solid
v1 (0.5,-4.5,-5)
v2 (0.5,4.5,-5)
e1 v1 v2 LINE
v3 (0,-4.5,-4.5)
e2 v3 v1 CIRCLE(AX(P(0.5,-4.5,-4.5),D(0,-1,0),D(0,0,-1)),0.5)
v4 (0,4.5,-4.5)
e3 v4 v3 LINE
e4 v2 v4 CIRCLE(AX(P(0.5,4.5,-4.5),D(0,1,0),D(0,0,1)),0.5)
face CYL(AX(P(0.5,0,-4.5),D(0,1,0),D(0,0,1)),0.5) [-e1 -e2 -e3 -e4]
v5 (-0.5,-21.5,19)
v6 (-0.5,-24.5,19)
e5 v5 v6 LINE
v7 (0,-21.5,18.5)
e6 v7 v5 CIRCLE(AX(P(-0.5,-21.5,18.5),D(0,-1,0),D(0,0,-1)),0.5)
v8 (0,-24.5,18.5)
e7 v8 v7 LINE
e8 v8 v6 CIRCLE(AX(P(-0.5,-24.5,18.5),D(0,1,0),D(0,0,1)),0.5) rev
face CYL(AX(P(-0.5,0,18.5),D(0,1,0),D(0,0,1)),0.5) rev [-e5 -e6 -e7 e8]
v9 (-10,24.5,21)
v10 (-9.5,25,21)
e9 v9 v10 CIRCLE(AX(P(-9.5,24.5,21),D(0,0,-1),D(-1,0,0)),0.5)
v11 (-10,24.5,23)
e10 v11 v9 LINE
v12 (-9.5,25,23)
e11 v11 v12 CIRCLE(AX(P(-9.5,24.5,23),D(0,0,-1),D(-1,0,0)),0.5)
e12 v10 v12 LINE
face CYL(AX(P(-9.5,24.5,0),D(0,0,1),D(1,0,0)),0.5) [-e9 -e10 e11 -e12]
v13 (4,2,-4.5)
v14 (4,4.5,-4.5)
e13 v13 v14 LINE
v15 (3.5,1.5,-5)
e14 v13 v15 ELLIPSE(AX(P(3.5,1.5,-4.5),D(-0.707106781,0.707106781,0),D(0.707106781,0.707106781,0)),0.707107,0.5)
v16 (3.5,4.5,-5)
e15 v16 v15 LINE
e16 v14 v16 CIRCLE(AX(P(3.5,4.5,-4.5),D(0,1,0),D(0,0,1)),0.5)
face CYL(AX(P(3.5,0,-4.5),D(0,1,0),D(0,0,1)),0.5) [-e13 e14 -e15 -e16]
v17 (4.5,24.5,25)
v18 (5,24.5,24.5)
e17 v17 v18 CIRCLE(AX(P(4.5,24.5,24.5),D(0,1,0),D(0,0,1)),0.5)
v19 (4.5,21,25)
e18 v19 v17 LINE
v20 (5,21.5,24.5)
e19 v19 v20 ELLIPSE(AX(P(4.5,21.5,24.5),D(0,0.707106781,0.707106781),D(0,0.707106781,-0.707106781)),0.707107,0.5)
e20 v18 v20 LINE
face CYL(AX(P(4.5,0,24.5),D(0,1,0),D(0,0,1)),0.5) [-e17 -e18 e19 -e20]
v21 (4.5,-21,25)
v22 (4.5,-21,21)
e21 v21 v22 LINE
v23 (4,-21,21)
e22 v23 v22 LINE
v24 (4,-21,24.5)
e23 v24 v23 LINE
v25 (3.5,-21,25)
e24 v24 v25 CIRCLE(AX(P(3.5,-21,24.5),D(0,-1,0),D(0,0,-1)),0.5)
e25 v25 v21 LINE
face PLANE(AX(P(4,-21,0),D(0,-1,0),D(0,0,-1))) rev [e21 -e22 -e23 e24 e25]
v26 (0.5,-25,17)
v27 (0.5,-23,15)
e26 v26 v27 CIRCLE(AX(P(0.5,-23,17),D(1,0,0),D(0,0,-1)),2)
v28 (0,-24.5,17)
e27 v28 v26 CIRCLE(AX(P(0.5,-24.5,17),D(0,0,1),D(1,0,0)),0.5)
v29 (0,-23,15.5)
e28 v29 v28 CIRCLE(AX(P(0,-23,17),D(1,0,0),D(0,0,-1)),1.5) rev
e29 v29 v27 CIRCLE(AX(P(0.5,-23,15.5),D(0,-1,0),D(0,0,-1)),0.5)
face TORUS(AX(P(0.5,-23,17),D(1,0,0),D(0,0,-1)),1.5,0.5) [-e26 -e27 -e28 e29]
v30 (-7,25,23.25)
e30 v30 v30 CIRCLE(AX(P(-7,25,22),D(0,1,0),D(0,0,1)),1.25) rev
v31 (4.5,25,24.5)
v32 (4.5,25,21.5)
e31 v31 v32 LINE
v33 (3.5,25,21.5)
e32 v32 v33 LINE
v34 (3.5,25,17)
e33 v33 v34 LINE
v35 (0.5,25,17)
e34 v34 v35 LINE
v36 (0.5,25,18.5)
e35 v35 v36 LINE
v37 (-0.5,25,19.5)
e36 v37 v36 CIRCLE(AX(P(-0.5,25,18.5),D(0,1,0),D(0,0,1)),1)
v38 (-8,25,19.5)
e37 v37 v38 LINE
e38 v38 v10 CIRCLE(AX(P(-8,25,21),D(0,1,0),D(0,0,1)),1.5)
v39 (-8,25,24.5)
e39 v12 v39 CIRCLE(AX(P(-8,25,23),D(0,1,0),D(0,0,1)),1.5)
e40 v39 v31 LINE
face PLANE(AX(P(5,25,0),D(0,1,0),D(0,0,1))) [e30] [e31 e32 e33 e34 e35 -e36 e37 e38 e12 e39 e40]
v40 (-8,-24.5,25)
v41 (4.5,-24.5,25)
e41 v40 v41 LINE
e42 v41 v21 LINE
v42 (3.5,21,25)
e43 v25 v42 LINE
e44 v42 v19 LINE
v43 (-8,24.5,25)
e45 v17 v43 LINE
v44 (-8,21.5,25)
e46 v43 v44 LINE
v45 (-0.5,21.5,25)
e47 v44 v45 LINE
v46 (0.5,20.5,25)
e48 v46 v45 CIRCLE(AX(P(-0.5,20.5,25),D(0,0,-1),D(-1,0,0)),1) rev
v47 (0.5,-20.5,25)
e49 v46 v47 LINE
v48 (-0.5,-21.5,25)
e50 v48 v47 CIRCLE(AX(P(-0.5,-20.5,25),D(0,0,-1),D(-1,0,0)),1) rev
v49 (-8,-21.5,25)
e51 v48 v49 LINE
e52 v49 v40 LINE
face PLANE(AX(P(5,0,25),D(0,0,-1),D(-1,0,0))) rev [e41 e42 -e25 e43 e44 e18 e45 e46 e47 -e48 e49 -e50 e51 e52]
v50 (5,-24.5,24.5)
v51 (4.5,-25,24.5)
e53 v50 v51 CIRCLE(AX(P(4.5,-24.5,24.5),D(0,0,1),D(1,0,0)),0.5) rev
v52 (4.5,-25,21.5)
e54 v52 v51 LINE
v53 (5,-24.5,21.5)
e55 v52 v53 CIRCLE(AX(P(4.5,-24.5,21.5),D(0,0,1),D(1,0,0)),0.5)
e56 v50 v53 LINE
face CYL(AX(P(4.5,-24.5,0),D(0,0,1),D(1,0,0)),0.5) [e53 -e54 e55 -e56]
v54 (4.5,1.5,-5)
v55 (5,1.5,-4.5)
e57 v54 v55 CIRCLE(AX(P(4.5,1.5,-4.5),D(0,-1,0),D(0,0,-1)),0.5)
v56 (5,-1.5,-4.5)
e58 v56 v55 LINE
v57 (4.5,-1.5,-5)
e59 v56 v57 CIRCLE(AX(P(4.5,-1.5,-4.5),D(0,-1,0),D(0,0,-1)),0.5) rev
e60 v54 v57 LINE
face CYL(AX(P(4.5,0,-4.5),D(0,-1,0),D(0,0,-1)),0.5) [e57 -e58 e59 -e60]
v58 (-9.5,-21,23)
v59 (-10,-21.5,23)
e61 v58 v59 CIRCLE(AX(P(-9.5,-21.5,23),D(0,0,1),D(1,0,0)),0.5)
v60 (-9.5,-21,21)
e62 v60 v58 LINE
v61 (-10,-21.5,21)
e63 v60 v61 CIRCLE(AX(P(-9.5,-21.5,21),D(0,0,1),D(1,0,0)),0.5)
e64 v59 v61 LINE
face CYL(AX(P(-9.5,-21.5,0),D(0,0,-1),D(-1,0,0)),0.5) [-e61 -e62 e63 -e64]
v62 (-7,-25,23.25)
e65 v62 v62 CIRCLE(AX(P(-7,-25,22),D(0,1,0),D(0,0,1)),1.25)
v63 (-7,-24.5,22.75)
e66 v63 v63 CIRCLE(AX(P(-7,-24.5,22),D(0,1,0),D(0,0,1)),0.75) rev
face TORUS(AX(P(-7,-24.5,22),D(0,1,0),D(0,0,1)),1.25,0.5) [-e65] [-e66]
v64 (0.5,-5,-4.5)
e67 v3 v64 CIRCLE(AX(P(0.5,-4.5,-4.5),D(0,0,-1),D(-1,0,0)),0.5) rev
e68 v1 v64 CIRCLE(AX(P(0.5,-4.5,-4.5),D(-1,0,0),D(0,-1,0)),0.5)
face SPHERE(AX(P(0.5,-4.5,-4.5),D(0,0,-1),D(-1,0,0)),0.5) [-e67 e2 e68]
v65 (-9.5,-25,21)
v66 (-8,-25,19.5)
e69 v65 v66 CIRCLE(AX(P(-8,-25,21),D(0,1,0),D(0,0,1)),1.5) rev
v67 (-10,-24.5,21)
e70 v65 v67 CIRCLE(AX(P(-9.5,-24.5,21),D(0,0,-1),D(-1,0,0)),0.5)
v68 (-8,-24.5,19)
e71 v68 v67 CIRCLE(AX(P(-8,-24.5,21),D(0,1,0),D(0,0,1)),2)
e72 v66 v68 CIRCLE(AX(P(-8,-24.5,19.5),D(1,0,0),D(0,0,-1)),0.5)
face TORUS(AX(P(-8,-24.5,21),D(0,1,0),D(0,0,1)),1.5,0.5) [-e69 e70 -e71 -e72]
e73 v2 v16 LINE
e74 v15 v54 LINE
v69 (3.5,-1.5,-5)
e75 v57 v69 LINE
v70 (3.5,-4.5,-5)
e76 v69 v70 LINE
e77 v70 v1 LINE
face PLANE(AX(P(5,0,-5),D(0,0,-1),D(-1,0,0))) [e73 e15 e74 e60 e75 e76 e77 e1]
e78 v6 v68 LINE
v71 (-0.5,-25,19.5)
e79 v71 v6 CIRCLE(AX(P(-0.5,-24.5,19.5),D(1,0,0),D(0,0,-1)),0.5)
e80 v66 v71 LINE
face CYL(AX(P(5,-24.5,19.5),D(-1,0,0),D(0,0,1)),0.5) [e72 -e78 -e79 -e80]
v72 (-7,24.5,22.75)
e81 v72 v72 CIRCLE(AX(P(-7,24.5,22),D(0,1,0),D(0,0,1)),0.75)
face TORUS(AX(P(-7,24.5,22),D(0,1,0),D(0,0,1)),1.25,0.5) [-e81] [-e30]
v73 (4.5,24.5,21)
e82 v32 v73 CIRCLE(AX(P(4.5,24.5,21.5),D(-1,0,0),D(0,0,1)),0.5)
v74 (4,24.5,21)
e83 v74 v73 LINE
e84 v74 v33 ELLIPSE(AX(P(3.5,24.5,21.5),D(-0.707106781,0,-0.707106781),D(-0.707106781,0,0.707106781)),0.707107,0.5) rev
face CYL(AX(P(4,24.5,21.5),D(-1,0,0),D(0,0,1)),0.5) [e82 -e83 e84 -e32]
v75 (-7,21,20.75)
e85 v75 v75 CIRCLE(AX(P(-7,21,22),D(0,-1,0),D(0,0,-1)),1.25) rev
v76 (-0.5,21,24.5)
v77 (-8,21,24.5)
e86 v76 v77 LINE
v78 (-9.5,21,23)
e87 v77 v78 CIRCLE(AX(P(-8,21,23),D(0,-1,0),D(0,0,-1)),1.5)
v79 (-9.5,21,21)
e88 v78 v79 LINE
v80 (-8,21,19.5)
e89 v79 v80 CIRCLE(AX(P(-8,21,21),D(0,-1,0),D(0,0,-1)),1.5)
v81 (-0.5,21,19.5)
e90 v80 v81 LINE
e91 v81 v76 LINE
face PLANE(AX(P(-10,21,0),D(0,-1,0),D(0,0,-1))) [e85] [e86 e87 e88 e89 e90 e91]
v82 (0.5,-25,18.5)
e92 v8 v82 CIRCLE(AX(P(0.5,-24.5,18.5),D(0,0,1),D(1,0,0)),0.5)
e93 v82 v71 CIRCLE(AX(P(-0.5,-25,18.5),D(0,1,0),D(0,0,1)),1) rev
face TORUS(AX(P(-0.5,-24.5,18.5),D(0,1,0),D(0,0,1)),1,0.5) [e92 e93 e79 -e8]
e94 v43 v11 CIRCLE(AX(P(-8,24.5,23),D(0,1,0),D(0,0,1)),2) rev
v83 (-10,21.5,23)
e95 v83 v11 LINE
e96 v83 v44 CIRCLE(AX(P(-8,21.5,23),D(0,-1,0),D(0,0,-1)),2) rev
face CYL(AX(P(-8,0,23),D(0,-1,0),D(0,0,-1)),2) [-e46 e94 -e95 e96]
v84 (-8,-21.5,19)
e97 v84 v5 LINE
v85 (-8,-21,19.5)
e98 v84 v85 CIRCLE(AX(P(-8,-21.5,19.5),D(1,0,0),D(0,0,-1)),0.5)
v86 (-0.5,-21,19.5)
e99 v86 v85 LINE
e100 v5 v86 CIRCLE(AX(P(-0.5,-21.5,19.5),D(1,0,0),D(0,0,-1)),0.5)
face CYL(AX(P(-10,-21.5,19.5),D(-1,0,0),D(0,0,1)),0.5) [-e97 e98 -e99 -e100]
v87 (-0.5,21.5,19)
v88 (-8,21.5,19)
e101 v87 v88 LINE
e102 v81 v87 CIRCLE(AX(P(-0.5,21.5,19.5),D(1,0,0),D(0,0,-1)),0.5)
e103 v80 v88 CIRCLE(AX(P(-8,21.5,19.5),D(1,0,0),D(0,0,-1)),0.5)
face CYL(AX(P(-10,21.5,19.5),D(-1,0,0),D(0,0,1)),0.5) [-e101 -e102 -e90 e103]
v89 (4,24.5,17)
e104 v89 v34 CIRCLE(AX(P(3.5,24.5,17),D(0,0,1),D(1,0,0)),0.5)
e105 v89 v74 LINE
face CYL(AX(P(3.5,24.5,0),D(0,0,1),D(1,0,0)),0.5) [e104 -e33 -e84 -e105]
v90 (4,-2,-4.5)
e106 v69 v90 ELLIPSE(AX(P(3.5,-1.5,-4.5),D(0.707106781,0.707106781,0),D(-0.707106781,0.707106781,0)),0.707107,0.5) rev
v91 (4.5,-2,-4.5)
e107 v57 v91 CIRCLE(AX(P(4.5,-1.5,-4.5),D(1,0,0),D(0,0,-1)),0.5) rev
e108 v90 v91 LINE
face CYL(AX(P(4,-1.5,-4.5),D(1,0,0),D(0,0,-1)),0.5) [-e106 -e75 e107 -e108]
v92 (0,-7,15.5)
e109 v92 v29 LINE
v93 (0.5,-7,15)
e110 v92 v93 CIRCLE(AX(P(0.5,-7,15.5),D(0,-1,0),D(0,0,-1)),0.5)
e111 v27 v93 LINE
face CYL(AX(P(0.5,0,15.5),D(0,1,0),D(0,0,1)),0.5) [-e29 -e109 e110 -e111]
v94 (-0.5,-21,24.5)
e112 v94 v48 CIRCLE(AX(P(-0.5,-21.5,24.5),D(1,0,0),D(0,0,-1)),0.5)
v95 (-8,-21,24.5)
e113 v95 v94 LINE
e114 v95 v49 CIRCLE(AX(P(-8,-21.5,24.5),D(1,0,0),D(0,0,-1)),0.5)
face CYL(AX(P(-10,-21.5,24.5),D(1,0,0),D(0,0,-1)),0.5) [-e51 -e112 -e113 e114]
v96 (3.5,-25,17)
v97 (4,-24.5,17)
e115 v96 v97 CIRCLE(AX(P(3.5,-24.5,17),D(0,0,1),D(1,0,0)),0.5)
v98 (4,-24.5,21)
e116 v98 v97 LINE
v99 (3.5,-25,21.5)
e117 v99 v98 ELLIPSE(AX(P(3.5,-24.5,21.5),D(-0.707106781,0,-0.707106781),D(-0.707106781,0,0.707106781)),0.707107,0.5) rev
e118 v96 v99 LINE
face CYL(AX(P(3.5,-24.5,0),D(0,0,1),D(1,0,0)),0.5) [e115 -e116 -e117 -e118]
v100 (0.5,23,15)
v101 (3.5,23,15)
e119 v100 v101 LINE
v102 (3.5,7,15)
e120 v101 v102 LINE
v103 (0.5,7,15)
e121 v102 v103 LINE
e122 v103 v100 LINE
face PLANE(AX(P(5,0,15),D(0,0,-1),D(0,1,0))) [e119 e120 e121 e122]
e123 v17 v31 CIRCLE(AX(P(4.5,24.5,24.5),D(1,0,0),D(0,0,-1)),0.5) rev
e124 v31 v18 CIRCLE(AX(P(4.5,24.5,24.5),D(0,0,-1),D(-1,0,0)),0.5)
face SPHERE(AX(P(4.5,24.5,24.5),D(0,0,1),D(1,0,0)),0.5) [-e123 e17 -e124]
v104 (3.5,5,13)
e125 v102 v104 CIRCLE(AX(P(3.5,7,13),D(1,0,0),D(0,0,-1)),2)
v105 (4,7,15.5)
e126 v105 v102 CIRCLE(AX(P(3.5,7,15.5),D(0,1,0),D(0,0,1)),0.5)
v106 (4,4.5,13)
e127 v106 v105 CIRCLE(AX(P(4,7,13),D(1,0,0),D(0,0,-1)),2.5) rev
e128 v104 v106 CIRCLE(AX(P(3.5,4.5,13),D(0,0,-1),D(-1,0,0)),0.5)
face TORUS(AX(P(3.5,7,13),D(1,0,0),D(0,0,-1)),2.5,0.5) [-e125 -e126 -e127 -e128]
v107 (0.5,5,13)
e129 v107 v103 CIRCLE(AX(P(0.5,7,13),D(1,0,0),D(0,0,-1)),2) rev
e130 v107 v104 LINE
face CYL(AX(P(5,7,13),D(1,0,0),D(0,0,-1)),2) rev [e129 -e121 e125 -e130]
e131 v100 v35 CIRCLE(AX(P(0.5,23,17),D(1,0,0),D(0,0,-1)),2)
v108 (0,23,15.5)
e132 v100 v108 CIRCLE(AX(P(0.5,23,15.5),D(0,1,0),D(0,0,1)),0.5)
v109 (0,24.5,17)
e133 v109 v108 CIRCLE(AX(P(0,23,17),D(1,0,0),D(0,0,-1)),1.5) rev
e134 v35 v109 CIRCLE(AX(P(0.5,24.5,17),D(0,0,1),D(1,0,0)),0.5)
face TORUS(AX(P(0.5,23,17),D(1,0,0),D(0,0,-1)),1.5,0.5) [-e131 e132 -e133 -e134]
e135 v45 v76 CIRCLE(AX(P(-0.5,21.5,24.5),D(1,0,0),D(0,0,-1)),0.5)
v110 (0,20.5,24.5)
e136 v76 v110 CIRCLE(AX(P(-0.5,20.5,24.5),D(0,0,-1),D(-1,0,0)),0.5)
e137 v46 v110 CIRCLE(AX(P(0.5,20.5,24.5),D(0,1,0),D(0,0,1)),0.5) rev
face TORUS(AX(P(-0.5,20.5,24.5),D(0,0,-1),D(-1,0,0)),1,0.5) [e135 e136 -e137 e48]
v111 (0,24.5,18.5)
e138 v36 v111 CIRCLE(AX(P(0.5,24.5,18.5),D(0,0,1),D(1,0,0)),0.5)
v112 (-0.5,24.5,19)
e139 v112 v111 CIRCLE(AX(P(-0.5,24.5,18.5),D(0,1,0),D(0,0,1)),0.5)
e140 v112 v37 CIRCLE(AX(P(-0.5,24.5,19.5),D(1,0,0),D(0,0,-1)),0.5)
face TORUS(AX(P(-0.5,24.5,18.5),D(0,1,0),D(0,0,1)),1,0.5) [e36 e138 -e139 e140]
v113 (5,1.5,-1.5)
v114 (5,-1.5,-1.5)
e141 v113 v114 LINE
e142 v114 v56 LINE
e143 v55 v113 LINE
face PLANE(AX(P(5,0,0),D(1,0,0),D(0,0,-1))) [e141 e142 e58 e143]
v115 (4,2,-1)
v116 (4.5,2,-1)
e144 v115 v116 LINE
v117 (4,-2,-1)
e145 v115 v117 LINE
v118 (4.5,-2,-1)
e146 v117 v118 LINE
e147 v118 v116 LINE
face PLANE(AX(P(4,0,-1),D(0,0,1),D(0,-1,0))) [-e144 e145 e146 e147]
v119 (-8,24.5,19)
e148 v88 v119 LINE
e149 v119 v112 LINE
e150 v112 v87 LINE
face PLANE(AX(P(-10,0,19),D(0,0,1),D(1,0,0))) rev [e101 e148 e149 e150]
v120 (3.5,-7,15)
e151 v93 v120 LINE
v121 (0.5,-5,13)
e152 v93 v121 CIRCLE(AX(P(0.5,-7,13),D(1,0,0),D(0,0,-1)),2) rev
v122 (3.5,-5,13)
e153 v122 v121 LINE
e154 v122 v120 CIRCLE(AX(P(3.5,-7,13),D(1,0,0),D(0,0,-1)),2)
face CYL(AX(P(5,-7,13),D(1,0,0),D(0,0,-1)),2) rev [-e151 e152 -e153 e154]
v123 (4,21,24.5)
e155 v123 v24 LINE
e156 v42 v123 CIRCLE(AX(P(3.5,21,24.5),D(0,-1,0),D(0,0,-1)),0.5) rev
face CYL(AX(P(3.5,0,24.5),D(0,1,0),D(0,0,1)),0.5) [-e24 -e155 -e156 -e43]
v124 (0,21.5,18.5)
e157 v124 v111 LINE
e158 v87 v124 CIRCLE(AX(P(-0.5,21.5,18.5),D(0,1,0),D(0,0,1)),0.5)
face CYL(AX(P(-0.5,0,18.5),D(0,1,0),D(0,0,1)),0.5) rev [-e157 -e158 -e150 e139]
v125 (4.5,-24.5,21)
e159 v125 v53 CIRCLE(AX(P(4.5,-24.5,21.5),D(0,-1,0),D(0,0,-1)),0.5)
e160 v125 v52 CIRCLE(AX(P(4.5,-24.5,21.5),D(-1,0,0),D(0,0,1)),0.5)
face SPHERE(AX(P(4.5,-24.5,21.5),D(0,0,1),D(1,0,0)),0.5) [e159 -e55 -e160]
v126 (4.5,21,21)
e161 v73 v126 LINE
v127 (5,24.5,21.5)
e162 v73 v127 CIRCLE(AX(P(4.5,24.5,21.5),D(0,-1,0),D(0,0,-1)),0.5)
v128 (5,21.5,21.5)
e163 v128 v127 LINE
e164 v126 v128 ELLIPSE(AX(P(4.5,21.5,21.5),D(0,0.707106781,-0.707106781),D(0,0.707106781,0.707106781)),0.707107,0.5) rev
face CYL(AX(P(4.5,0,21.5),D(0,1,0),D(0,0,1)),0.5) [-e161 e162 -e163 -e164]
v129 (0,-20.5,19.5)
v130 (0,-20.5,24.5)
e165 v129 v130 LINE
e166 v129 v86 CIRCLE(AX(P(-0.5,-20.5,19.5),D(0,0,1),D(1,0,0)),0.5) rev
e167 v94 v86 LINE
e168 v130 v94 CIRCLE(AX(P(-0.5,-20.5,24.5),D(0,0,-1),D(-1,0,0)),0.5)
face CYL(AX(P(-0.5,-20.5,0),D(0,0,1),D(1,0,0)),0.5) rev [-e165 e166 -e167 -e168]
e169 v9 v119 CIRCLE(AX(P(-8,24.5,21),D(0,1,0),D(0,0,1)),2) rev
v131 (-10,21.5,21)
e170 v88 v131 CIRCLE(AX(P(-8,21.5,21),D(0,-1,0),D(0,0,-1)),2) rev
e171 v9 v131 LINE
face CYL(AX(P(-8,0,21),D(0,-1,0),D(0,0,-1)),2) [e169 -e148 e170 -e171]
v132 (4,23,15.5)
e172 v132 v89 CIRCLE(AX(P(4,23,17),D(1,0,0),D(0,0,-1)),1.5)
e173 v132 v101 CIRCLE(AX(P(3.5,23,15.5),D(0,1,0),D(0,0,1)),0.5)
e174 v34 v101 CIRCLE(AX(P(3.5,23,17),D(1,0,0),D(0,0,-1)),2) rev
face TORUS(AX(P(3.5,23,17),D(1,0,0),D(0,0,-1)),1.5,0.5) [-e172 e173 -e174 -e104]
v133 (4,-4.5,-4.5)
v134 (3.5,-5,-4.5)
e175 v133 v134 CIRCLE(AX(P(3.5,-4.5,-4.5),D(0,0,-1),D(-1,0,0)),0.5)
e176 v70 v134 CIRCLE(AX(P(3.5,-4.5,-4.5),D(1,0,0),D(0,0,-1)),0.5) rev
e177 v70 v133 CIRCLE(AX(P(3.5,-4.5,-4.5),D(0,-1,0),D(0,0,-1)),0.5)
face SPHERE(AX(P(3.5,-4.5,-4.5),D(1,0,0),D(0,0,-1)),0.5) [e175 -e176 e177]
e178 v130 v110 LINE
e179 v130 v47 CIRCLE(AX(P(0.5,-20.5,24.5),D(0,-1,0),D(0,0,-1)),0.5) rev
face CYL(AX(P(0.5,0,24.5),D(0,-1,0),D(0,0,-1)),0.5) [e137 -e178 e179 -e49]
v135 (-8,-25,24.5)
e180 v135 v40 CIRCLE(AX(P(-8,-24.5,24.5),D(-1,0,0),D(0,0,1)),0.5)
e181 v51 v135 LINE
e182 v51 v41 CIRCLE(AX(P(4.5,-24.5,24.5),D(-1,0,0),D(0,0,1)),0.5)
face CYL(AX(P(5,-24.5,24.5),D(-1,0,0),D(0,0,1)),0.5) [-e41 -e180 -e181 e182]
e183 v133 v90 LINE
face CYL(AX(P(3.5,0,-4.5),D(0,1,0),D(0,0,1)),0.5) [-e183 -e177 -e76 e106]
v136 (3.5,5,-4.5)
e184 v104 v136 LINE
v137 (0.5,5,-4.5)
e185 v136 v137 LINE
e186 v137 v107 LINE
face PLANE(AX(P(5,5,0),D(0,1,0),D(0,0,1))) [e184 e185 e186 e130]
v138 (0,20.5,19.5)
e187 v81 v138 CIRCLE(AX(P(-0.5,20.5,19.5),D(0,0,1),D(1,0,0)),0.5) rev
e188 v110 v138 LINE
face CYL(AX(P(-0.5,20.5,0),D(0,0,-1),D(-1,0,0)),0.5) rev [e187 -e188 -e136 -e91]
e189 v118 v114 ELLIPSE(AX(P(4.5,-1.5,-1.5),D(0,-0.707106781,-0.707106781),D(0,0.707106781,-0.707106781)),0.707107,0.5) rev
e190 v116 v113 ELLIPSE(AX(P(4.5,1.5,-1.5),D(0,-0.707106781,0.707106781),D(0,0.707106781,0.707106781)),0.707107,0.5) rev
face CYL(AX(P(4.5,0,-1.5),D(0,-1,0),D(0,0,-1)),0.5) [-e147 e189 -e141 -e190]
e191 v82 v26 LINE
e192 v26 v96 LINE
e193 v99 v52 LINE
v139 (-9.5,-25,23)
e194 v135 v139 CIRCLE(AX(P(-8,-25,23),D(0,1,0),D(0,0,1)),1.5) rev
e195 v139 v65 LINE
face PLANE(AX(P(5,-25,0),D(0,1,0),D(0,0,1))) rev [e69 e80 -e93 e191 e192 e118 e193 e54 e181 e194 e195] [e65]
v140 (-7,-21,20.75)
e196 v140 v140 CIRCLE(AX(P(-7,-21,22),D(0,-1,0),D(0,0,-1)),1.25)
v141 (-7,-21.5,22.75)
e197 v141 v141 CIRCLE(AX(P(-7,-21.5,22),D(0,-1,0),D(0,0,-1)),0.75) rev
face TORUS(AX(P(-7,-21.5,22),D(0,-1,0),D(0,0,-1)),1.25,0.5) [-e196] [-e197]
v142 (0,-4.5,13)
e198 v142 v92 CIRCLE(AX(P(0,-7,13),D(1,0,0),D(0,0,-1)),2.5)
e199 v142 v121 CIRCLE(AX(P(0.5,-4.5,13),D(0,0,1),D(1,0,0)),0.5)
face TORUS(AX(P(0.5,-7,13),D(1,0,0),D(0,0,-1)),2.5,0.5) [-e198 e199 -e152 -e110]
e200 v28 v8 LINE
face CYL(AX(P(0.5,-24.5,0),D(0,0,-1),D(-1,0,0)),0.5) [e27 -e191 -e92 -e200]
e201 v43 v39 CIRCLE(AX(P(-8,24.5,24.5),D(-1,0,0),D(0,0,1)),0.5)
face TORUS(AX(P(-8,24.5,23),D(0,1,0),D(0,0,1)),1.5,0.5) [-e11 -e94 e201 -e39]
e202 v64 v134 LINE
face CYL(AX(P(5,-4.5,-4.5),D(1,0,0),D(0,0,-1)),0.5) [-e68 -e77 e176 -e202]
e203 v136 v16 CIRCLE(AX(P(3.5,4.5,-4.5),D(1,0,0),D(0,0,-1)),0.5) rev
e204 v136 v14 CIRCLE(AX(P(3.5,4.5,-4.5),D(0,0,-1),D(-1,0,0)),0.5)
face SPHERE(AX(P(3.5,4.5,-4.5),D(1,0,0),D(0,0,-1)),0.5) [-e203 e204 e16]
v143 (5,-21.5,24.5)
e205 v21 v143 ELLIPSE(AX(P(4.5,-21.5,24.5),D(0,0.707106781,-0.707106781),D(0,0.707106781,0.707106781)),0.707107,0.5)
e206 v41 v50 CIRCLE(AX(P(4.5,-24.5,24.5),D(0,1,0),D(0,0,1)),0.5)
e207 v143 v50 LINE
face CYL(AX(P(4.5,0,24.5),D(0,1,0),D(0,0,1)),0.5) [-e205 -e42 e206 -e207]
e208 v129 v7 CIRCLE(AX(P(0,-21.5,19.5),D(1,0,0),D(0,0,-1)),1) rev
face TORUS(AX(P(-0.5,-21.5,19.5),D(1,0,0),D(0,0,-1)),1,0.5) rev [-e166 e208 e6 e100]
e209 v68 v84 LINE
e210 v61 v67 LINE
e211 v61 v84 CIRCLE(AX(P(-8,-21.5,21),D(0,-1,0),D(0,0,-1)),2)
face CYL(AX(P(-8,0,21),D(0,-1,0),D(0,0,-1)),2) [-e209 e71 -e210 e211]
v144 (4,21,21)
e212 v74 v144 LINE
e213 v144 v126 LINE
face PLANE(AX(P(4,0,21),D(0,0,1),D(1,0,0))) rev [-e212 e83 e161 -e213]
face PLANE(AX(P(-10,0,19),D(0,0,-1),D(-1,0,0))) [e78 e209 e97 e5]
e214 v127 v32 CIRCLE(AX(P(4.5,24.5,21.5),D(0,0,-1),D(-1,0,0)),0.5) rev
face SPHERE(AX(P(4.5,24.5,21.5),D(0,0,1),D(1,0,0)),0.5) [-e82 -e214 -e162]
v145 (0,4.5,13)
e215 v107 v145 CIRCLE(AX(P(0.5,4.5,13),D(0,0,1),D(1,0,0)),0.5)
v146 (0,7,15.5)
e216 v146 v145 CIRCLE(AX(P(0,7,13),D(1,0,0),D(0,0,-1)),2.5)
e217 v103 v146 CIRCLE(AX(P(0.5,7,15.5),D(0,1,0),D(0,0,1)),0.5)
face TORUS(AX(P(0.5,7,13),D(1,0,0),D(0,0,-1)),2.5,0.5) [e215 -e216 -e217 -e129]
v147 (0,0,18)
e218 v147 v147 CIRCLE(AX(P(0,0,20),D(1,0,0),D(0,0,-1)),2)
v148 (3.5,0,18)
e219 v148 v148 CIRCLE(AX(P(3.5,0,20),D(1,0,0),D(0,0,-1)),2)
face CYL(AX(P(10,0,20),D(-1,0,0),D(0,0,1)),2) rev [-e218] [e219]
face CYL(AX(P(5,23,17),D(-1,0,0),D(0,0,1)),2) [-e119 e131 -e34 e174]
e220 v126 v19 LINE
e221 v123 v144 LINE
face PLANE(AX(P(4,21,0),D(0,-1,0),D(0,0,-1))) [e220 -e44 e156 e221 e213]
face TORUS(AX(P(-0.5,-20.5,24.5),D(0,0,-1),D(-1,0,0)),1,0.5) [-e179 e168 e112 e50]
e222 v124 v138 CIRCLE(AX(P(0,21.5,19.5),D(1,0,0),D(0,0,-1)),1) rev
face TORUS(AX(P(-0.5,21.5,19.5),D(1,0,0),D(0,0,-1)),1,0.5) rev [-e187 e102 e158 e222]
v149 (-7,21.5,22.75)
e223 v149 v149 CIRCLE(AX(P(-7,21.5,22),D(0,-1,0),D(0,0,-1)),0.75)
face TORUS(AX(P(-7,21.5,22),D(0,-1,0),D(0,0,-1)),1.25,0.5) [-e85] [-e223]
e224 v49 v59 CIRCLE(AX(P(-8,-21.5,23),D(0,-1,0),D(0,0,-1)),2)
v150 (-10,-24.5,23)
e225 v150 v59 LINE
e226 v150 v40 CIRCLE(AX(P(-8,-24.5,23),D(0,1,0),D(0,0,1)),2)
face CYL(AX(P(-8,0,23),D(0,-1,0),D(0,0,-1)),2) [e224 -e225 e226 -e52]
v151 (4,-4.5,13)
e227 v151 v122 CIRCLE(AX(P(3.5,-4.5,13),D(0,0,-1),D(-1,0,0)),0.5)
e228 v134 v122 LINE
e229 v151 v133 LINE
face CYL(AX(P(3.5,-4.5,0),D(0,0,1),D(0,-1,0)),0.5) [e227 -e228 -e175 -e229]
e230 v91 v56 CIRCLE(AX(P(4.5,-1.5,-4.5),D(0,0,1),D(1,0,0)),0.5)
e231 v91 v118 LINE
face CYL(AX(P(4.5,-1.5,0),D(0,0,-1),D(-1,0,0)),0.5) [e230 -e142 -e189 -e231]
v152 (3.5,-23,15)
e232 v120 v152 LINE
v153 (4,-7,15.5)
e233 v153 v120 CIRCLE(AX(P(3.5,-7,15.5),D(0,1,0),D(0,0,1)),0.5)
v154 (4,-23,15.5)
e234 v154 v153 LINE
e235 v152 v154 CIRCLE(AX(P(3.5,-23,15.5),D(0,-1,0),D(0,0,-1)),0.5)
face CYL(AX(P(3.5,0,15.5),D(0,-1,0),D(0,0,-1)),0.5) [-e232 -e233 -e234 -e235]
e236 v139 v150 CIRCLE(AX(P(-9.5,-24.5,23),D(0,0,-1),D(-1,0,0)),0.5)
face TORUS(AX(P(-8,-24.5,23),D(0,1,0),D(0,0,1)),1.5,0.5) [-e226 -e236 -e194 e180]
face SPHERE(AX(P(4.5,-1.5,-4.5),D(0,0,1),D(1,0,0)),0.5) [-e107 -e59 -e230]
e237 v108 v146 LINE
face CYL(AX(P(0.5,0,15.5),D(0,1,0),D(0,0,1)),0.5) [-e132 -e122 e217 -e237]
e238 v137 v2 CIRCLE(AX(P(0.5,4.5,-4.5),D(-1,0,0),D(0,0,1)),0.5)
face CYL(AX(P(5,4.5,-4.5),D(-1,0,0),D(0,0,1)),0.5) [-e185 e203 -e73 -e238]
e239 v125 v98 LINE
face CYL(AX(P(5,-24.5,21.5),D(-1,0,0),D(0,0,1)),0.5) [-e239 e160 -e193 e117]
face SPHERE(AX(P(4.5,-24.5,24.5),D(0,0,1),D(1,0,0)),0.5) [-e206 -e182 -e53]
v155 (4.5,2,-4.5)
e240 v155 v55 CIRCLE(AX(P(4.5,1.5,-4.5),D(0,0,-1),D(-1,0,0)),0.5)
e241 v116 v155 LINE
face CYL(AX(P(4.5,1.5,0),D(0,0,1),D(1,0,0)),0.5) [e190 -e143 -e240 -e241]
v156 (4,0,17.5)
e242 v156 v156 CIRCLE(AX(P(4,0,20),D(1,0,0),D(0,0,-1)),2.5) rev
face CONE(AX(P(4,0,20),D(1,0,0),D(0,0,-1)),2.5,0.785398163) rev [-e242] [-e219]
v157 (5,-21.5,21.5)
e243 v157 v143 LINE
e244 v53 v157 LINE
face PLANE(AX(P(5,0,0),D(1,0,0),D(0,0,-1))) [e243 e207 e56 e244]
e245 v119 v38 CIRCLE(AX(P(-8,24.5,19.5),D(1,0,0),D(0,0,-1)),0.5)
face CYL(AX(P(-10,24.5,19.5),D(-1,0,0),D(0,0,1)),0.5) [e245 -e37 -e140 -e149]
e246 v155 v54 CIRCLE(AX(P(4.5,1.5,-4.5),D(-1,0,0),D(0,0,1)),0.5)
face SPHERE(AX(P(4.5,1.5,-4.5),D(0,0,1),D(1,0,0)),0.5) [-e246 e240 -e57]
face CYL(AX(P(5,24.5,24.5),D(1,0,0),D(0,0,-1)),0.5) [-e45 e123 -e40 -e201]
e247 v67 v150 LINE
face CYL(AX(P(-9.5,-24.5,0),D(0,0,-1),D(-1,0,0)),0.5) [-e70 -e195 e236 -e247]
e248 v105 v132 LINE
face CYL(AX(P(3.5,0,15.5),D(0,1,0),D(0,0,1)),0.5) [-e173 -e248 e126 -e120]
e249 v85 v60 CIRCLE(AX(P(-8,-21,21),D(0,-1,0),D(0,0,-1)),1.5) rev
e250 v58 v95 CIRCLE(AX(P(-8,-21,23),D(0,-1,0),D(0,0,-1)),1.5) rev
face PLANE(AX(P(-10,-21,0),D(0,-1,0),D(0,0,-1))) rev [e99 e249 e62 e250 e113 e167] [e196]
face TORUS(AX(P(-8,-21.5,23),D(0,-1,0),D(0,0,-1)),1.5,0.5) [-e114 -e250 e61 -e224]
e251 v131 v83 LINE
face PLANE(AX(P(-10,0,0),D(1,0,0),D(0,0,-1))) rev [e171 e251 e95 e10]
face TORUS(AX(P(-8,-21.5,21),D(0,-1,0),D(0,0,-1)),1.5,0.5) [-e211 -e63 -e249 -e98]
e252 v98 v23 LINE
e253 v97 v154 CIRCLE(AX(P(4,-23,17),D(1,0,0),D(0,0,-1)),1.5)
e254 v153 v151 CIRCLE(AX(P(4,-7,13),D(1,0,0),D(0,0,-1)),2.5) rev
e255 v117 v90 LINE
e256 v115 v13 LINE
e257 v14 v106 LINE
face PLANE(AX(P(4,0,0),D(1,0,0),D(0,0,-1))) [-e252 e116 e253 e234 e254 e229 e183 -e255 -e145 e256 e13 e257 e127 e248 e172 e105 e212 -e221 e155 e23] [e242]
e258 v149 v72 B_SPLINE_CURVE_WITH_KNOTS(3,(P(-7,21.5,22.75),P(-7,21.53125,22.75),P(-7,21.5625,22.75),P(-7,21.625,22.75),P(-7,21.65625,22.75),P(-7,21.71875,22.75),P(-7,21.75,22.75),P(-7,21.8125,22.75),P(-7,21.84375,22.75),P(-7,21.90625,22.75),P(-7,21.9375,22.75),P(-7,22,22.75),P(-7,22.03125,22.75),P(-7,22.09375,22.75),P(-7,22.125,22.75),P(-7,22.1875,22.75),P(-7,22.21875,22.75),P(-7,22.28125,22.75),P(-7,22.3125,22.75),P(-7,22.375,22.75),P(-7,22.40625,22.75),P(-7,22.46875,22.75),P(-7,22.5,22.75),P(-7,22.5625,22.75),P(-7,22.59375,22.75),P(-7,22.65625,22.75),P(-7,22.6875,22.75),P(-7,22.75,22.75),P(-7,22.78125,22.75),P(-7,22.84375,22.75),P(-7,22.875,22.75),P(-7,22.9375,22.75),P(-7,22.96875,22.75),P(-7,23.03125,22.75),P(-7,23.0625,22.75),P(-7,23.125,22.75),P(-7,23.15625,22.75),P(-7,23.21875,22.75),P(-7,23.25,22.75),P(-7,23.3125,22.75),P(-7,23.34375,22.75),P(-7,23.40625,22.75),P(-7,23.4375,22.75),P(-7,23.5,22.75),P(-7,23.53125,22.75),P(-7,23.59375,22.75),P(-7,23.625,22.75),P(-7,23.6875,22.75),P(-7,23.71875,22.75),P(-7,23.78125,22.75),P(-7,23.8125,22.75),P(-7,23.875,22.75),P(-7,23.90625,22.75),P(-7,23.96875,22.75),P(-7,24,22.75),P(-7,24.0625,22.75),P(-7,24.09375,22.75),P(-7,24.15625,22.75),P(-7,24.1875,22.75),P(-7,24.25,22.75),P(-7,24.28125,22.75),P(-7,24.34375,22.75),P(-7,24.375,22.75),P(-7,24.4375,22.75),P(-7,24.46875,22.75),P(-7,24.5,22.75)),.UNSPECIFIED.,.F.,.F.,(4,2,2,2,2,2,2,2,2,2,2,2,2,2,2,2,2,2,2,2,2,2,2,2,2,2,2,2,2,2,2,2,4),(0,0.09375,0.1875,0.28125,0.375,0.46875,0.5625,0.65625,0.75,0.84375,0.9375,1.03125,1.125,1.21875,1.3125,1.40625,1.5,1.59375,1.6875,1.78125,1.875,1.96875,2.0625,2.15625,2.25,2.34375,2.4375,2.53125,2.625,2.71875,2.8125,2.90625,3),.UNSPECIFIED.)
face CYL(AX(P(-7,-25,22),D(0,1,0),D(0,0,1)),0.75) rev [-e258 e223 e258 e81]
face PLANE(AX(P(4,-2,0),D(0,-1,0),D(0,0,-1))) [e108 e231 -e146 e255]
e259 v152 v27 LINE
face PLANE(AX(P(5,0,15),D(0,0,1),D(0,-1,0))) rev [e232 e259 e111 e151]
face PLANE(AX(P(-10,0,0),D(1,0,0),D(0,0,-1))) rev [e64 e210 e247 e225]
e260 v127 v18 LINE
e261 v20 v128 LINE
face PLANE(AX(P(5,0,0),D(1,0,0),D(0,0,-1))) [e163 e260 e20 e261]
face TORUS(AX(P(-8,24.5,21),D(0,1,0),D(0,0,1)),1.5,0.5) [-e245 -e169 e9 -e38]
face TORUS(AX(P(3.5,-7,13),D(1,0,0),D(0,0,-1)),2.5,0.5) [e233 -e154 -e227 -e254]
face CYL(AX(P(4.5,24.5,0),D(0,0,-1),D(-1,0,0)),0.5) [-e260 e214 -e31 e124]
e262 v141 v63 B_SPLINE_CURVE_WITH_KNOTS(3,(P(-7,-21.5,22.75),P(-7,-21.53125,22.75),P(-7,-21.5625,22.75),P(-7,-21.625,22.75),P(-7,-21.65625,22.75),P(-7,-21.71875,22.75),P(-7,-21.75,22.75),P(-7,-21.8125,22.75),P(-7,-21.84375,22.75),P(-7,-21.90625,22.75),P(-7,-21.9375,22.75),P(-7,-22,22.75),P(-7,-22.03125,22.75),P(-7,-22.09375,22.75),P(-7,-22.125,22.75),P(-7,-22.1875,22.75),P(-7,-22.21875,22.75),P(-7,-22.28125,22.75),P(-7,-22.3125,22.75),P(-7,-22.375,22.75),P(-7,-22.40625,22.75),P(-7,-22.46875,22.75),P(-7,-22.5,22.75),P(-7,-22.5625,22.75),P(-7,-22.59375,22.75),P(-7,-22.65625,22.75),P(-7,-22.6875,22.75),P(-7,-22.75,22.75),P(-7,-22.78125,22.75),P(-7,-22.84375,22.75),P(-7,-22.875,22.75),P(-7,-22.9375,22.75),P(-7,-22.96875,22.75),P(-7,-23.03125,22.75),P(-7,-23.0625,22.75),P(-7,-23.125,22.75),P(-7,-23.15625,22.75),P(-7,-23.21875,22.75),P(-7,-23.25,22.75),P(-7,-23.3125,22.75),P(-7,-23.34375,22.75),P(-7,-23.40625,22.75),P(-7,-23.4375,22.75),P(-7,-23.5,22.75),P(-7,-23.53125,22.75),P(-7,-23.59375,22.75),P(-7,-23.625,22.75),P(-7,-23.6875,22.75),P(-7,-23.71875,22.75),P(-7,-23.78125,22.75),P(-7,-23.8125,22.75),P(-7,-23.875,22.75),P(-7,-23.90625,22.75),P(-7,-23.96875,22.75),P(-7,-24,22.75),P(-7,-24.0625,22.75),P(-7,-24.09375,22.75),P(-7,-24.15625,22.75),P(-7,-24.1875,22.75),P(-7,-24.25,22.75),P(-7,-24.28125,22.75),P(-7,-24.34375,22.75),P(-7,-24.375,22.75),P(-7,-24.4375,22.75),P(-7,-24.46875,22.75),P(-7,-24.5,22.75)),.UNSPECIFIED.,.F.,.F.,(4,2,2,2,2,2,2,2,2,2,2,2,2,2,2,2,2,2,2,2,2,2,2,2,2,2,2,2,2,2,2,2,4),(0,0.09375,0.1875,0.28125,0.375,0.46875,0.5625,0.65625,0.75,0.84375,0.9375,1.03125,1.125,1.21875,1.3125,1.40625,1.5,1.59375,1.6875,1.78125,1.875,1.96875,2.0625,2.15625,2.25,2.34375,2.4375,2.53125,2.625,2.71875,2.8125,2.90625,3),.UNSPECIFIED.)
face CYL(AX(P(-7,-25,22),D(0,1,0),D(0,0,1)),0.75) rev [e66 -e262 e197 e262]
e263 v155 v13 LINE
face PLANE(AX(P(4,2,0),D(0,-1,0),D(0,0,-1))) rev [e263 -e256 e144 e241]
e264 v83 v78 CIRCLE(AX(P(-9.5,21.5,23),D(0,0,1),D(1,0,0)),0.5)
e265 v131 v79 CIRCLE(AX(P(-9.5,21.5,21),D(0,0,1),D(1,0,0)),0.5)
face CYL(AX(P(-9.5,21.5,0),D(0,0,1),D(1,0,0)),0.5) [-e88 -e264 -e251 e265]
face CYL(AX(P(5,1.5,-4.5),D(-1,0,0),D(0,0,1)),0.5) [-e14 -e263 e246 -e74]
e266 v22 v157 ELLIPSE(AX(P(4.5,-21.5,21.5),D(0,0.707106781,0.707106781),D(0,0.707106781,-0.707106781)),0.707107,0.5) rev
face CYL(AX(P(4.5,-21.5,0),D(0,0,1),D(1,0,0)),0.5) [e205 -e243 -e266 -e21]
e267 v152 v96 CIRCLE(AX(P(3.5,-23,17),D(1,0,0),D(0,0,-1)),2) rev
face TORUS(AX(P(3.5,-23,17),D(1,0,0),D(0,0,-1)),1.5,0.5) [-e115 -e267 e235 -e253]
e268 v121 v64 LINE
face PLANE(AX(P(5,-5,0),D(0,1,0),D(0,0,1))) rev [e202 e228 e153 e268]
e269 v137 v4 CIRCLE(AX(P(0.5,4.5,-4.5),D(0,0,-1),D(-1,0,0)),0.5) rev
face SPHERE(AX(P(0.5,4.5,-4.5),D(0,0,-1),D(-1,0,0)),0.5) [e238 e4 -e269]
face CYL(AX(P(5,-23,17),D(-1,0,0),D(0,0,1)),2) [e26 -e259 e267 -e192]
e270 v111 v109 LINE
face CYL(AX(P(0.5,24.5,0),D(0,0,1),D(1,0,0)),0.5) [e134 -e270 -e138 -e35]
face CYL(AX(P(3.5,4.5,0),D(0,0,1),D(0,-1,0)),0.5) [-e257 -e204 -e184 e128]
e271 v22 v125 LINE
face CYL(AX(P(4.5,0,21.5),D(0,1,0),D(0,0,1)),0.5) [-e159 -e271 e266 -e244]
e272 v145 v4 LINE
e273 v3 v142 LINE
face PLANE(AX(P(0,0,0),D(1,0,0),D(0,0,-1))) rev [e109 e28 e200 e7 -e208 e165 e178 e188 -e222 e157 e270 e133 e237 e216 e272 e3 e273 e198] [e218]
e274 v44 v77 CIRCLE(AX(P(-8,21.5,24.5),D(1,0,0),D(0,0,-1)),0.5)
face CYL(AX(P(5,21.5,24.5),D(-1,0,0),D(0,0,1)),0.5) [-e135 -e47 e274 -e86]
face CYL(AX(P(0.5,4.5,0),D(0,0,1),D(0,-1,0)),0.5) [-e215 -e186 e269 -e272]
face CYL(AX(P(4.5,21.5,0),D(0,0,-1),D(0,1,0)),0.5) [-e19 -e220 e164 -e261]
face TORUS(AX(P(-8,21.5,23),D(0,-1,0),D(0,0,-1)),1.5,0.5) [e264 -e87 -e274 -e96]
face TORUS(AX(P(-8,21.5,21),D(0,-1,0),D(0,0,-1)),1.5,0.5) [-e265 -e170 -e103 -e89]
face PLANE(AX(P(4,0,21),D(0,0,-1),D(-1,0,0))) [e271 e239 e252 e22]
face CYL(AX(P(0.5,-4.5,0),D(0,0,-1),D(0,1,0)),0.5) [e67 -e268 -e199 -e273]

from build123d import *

# Parameters (mm, degrees)
BOSS_EXTRUDE1_DEPTH = 5
SKETCH2_3_W         = 6
SKETCH2_3_H         = 4
BOSS_EXTRUDE2_DEPTH = 10
SKETCH2_4_R         = 2
CUT_EXTRUDE1_DEPTH  = 10
FILLET1_R           = 2
SKETCH3_R           = 0.75
CUT_EXTRUDE3_DEPTH  = 50
CUT_EXTRUDE4_DEPTH  = 1
FILLET4_R           = 2
FILLET5_R           = 0.5
FILLET7_R           = 0.5
CHAMFER1_SIZE       = 0.5


with BuildPart() as part:
    # Sketch2 → Boss-Extrude1 (new body)
    with BuildSketch(Plane(origin=(0, 0, 0), x_dir=(0, 0, -1), z_dir=(1, 0, 0))):
        Polygon((-25, 25), (-25, -25), (-15, -25), (-15, -5), (5, -5), (5, 5), (-15, 5), (-15, 25), align=None)
    extrude(amount=BOSS_EXTRUDE1_DEPTH)

    # Sketch2<3> → Boss-Extrude2 (add)
    with BuildSketch(Plane(origin=(0, 0, 0), x_dir=(0, 0, -1), z_dir=(1, 0, 0))):
        with Locations((-22, 23)):
            Rectangle(SKETCH2_3_W, SKETCH2_3_H)
        with Locations((-22, -23)):
            Rectangle(SKETCH2_3_W, SKETCH2_3_H)
    extrude(amount=-BOSS_EXTRUDE2_DEPTH)

    # Sketch2<4> → Cut-Extrude1 (cut)
    with BuildSketch(Plane(origin=(0, 0, 0), x_dir=(0, 0, -1), z_dir=(1, 0, 0))):
        with Locations((-20, 0)):
            Circle(SKETCH2_4_R)
    extrude(amount=CUT_EXTRUDE1_DEPTH, mode=Mode.SUBTRACT)

    # Fillet1
    fillet1_edges = [part.edges().sort_by_distance(p)[0] for p in [
        (-10, 23, 25),
        (-10, 23, 19),
        (-10, -23, 25),
        (-10, -23, 19),
    ]]
    fillet(fillet1_edges, radius=FILLET1_R)

    # Sketch3 → Cut-Extrude3 (cut)
    with BuildSketch(Plane(origin=(0, 25, 0), x_dir=(1, 0, 0), z_dir=(0, 1, 0))):
        with Locations(Location((-7, -22, 0), (0, 0, 270))):
            Circle(SKETCH3_R)
    extrude(amount=-CUT_EXTRUDE3_DEPTH, mode=Mode.SUBTRACT)

    # Sketch4 → Cut-Extrude4 (cut)
    with BuildSketch(Plane(origin=(5, 0, 0), x_dir=(0, 0, -1), z_dir=(1, 0, 0))):
        Polygon((-15, 25), (-21, 25), (-21, 21), (-25, 21), (-25, -21), (-21, -21), (-21, -25), (-15, -25), (-15, -5), (5, -5), (5, -2), (1, -2), (1, 2), (5, 2), (5, 5), (-15, 5), align=None)
    extrude(amount=-CUT_EXTRUDE4_DEPTH, mode=Mode.SUBTRACT)

    # Fillet4
    fillet4_edges = [part.edges().sort_by_distance(p)[0] for p in [
        (2, -25, 15),
        (2, 25, 15),
        (2, 5, 15),
        (2, -5, 15),
    ]]
    fillet(fillet4_edges, radius=FILLET4_R)

    # Fillet5
    fillet5_edges = [part.edges().sort_by_distance(p)[0] for p in [
        (-7, 21, 21.25),
        (-7, -25, 21.25),
        (-7, -21, 21.25),
        (-7, 25, 21.25),
        (5, 0, -5),
        (5, -25, 23),
        (2, 5, -5),
        (2, -5, -5),
        (4, -3.5, -5),
        (4.5, -2, -5),
        (4, -25, 19),
        (4.5, -25, 21),
        (4, 0, 25),
        (4.5, 25, 21),
        (4, 5, 4),
        (4, 3.5, -5),
        (4.5, 2, -5),
        (0, 0, -5),
        (4, 25, 19),
        (0, 15, 15),
        (0, 5, 4),
        (0, -5, 4),
        (0, -15, 15),
        (0, -24.414213562, 15.585786438),
        (0, 24.414213562, 15.585786438),
        (4, 15, 15),
        (4, -15, 15),
        (4, -5, 4),
        (4, -24.414213562, 15.585786438),
        (4, 24.414213562, 15.585786438),
        (0, -5.585786438, 14.414213562),
        (4, -5.585786438, 14.414213562),
        (0, 5.585786438, 14.414213562),
        (4, 5.585786438, 14.414213562),
        (-1.5, -25, 25),
        (-1.5, 25, 25),
        (0, 0, 25),
        (0, 25, 18),
        (0, 23, 19),
        (0, 21, 22),
        (5, 25, 23),
        (0, -25, 18),
        (0, -21, 22),
        (0, -23, 19),
        (-4, -25, 19),
        (-4, -21, 19),
        (-10, -21, 22),
        (-9.414213562, -21, 24.414213562),
        (-9.414213562, -21, 19.585786438),
        (-10, -25, 22),
        (-9.414213562, -25, 24.414213562),
        (-9.414213562, -25, 19.585786438),
        (-10, 21, 22),
        (-10, 25, 22),
        (-4, 21, 19),
        (-9.414213562, 21, 24.414213562),
        (-9.414213562, 21, 19.585786438),
        (-4, 25, 19),
        (-9.414213562, 25, 24.414213562),
        (-9.414213562, 25, 19.585786438),
    ]]
    fillet(fillet5_edges, radius=FILLET5_R)

    # Fillet7
    # the kernel refuses this fillet: 0.5 mm, written as the material it takes off along each edge
    with BuildSketch(Plane(origin=(4.5, 1.5, -4.5), x_dir=(0, 1, 0), z_dir=(1, 0, 0))) as fillet7_piece_1_section:
        Polygon((0, 0), (FILLET7_R, 0), (FILLET7_R, -FILLET7_R), (0, -FILLET7_R), align=None)
    fillet7_piece_1 = extrude(amount=FILLET7_R, mode=Mode.PRIVATE)
    fillet7_piece_1 = fillet7_piece_1 - Plane(origin=(4.5, 1.5, -4.5), x_dir=(0, -0.7071067811865475, 0.7071067811865475), z_dir=(1, 0, 0)) * Sphere(FILLET7_R, mode=Mode.PRIVATE)
    add(fillet7_piece_1, mode=Mode.SUBTRACT)
    with BuildSketch(Plane(origin=(4.5, -1.5, -4.5), x_dir=(0, -1, 0), z_dir=(1, 0, 0))) as fillet7_piece_2_section:
        Polygon((0, 0), (FILLET7_R, 0), (FILLET7_R, FILLET7_R), (0, FILLET7_R), align=None)
    fillet7_piece_2 = extrude(amount=FILLET7_R, mode=Mode.PRIVATE)
    fillet7_piece_2 = fillet7_piece_2 - Plane(origin=(4.5, -1.5, -4.5), x_dir=(0, 0.7071067811865475, 0.7071067811865475), z_dir=(1, 0, 0)) * Sphere(FILLET7_R, mode=Mode.PRIVATE)
    add(fillet7_piece_2, mode=Mode.SUBTRACT)
    with BuildSketch(Plane(origin=(4.5, 24.5, 21.5), x_dir=(0, 0, -1), z_dir=(1, 0, 0))) as fillet7_piece_3_section:
        Polygon((0, 0), (FILLET7_R, 0), (FILLET7_R, FILLET7_R), (0, FILLET7_R), align=None)
    fillet7_piece_3 = extrude(amount=FILLET7_R, mode=Mode.PRIVATE)
    fillet7_piece_3 = fillet7_piece_3 - Plane(origin=(4.5, 24.5, 21.5), x_dir=(0, -0.7071067811865475, 0.7071067811865475), z_dir=(1, 0, 0)) * Sphere(FILLET7_R, mode=Mode.PRIVATE)
    add(fillet7_piece_3, mode=Mode.SUBTRACT)
    with BuildSketch(Plane(origin=(4.5, -24.5, 21.5), x_dir=(0, 0, -1), z_dir=(1, 0, 0))) as fillet7_piece_4_section:
        Polygon((0, 0), (FILLET7_R, 0), (FILLET7_R, -FILLET7_R), (0, -FILLET7_R), align=None)
    fillet7_piece_4 = extrude(amount=FILLET7_R, mode=Mode.PRIVATE)
    fillet7_piece_4 = fillet7_piece_4 - Plane(origin=(4.5, -24.5, 21.5), x_dir=(0, 0.7071067811865475, 0.7071067811865475), z_dir=(1, 0, 0)) * Sphere(FILLET7_R, mode=Mode.PRIVATE)
    add(fillet7_piece_4, mode=Mode.SUBTRACT)
    with BuildSketch(Plane(origin=(4.5, 24.5, 24.5), x_dir=(1, 0, 0), z_dir=(0, 0, 1))) as fillet7_piece_5_section:
        Polygon((0, 0), (FILLET7_R, 0), (FILLET7_R, FILLET7_R), (0, FILLET7_R), align=None)
    fillet7_piece_5 = extrude(amount=FILLET7_R, mode=Mode.PRIVATE)
    fillet7_piece_5 = fillet7_piece_5 - Plane(origin=(4.5, 24.5, 24.5), x_dir=(-0.7071067811865475, -0.7071067811865475, 0), z_dir=(0, 0, 1)) * Sphere(FILLET7_R, mode=Mode.PRIVATE)
    add(fillet7_piece_5, mode=Mode.SUBTRACT)
    with BuildSketch(Plane(origin=(4.5, -24.5, 24.5), x_dir=(1, 0, 0), z_dir=(0, 0, 1))) as fillet7_piece_6_section:
        Polygon((0, 0), (FILLET7_R, 0), (FILLET7_R, -FILLET7_R), (0, -FILLET7_R), align=None)
    fillet7_piece_6 = extrude(amount=FILLET7_R, mode=Mode.PRIVATE)
    fillet7_piece_6 = fillet7_piece_6 - Plane(origin=(4.5, -24.5, 24.5), x_dir=(-0.7071067811865475, 0.7071067811865475, 0), z_dir=(0, 0, 1)) * Sphere(FILLET7_R, mode=Mode.PRIVATE)
    add(fillet7_piece_6, mode=Mode.SUBTRACT)
    with BuildSketch(Plane(origin=(5, -19.75, 25), x_dir=(-1, 0, 0), z_dir=(0, -1, 0)), Plane(origin=(5, -2, -4.5), x_dir=(0, 1, 0), z_dir=(0, 0, 1)), Plane(origin=(5, 2, 0.25), x_dir=(0, -1, 0), z_dir=(0, 0, -1)), Plane(origin=(5, 24.5, 25), x_dir=(-1, 0, 0), z_dir=(0, -1, 0)), Plane(origin=(5, -19.75, 21), x_dir=(0, 0, 1), z_dir=(0, -1, 0)), Plane(origin=(5, 24.5, 21), x_dir=(0, 0, 1), z_dir=(0, -1, 0))) as fillet7_piece_7:
        with BuildLine():
            CenterArc((FILLET7_R, FILLET7_R), FILLET7_R, 180, 90)
            Line((0, FILLET7_R), (0, 0))
            Line((0, 0), (FILLET7_R, 0))
        make_face()
    extrude(amount=4.75, mode=Mode.SUBTRACT)
    with BuildSketch(Plane(origin=(5, 21, 19.75), x_dir=(0, 1, 0), z_dir=(0, 0, 1)), Plane(origin=(5, -3.25, -1), x_dir=(0, 0, -1), z_dir=(0, 1, 0)), Plane(origin=(5, -21, 26.25), x_dir=(0, -1, 0), z_dir=(0, 0, -1))) as fillet7_piece_8:
        with BuildLine():
            CenterArc((FILLET7_R, FILLET7_R), FILLET7_R, 180, 90)
            Line((0, FILLET7_R), (0, 0))
            Line((0, 0), (FILLET7_R, 0))
        make_face()
    extrude(amount=6.5, mode=Mode.SUBTRACT)

    # Chamfer1
    chamfer1_edges = [part.edges().sort_by_distance(p)[0] for p in [
        (4, 0, 22),
    ]]
    chamfer(chamfer1_edges, length=CHAMFER1_SIZE)


solid = part.part
